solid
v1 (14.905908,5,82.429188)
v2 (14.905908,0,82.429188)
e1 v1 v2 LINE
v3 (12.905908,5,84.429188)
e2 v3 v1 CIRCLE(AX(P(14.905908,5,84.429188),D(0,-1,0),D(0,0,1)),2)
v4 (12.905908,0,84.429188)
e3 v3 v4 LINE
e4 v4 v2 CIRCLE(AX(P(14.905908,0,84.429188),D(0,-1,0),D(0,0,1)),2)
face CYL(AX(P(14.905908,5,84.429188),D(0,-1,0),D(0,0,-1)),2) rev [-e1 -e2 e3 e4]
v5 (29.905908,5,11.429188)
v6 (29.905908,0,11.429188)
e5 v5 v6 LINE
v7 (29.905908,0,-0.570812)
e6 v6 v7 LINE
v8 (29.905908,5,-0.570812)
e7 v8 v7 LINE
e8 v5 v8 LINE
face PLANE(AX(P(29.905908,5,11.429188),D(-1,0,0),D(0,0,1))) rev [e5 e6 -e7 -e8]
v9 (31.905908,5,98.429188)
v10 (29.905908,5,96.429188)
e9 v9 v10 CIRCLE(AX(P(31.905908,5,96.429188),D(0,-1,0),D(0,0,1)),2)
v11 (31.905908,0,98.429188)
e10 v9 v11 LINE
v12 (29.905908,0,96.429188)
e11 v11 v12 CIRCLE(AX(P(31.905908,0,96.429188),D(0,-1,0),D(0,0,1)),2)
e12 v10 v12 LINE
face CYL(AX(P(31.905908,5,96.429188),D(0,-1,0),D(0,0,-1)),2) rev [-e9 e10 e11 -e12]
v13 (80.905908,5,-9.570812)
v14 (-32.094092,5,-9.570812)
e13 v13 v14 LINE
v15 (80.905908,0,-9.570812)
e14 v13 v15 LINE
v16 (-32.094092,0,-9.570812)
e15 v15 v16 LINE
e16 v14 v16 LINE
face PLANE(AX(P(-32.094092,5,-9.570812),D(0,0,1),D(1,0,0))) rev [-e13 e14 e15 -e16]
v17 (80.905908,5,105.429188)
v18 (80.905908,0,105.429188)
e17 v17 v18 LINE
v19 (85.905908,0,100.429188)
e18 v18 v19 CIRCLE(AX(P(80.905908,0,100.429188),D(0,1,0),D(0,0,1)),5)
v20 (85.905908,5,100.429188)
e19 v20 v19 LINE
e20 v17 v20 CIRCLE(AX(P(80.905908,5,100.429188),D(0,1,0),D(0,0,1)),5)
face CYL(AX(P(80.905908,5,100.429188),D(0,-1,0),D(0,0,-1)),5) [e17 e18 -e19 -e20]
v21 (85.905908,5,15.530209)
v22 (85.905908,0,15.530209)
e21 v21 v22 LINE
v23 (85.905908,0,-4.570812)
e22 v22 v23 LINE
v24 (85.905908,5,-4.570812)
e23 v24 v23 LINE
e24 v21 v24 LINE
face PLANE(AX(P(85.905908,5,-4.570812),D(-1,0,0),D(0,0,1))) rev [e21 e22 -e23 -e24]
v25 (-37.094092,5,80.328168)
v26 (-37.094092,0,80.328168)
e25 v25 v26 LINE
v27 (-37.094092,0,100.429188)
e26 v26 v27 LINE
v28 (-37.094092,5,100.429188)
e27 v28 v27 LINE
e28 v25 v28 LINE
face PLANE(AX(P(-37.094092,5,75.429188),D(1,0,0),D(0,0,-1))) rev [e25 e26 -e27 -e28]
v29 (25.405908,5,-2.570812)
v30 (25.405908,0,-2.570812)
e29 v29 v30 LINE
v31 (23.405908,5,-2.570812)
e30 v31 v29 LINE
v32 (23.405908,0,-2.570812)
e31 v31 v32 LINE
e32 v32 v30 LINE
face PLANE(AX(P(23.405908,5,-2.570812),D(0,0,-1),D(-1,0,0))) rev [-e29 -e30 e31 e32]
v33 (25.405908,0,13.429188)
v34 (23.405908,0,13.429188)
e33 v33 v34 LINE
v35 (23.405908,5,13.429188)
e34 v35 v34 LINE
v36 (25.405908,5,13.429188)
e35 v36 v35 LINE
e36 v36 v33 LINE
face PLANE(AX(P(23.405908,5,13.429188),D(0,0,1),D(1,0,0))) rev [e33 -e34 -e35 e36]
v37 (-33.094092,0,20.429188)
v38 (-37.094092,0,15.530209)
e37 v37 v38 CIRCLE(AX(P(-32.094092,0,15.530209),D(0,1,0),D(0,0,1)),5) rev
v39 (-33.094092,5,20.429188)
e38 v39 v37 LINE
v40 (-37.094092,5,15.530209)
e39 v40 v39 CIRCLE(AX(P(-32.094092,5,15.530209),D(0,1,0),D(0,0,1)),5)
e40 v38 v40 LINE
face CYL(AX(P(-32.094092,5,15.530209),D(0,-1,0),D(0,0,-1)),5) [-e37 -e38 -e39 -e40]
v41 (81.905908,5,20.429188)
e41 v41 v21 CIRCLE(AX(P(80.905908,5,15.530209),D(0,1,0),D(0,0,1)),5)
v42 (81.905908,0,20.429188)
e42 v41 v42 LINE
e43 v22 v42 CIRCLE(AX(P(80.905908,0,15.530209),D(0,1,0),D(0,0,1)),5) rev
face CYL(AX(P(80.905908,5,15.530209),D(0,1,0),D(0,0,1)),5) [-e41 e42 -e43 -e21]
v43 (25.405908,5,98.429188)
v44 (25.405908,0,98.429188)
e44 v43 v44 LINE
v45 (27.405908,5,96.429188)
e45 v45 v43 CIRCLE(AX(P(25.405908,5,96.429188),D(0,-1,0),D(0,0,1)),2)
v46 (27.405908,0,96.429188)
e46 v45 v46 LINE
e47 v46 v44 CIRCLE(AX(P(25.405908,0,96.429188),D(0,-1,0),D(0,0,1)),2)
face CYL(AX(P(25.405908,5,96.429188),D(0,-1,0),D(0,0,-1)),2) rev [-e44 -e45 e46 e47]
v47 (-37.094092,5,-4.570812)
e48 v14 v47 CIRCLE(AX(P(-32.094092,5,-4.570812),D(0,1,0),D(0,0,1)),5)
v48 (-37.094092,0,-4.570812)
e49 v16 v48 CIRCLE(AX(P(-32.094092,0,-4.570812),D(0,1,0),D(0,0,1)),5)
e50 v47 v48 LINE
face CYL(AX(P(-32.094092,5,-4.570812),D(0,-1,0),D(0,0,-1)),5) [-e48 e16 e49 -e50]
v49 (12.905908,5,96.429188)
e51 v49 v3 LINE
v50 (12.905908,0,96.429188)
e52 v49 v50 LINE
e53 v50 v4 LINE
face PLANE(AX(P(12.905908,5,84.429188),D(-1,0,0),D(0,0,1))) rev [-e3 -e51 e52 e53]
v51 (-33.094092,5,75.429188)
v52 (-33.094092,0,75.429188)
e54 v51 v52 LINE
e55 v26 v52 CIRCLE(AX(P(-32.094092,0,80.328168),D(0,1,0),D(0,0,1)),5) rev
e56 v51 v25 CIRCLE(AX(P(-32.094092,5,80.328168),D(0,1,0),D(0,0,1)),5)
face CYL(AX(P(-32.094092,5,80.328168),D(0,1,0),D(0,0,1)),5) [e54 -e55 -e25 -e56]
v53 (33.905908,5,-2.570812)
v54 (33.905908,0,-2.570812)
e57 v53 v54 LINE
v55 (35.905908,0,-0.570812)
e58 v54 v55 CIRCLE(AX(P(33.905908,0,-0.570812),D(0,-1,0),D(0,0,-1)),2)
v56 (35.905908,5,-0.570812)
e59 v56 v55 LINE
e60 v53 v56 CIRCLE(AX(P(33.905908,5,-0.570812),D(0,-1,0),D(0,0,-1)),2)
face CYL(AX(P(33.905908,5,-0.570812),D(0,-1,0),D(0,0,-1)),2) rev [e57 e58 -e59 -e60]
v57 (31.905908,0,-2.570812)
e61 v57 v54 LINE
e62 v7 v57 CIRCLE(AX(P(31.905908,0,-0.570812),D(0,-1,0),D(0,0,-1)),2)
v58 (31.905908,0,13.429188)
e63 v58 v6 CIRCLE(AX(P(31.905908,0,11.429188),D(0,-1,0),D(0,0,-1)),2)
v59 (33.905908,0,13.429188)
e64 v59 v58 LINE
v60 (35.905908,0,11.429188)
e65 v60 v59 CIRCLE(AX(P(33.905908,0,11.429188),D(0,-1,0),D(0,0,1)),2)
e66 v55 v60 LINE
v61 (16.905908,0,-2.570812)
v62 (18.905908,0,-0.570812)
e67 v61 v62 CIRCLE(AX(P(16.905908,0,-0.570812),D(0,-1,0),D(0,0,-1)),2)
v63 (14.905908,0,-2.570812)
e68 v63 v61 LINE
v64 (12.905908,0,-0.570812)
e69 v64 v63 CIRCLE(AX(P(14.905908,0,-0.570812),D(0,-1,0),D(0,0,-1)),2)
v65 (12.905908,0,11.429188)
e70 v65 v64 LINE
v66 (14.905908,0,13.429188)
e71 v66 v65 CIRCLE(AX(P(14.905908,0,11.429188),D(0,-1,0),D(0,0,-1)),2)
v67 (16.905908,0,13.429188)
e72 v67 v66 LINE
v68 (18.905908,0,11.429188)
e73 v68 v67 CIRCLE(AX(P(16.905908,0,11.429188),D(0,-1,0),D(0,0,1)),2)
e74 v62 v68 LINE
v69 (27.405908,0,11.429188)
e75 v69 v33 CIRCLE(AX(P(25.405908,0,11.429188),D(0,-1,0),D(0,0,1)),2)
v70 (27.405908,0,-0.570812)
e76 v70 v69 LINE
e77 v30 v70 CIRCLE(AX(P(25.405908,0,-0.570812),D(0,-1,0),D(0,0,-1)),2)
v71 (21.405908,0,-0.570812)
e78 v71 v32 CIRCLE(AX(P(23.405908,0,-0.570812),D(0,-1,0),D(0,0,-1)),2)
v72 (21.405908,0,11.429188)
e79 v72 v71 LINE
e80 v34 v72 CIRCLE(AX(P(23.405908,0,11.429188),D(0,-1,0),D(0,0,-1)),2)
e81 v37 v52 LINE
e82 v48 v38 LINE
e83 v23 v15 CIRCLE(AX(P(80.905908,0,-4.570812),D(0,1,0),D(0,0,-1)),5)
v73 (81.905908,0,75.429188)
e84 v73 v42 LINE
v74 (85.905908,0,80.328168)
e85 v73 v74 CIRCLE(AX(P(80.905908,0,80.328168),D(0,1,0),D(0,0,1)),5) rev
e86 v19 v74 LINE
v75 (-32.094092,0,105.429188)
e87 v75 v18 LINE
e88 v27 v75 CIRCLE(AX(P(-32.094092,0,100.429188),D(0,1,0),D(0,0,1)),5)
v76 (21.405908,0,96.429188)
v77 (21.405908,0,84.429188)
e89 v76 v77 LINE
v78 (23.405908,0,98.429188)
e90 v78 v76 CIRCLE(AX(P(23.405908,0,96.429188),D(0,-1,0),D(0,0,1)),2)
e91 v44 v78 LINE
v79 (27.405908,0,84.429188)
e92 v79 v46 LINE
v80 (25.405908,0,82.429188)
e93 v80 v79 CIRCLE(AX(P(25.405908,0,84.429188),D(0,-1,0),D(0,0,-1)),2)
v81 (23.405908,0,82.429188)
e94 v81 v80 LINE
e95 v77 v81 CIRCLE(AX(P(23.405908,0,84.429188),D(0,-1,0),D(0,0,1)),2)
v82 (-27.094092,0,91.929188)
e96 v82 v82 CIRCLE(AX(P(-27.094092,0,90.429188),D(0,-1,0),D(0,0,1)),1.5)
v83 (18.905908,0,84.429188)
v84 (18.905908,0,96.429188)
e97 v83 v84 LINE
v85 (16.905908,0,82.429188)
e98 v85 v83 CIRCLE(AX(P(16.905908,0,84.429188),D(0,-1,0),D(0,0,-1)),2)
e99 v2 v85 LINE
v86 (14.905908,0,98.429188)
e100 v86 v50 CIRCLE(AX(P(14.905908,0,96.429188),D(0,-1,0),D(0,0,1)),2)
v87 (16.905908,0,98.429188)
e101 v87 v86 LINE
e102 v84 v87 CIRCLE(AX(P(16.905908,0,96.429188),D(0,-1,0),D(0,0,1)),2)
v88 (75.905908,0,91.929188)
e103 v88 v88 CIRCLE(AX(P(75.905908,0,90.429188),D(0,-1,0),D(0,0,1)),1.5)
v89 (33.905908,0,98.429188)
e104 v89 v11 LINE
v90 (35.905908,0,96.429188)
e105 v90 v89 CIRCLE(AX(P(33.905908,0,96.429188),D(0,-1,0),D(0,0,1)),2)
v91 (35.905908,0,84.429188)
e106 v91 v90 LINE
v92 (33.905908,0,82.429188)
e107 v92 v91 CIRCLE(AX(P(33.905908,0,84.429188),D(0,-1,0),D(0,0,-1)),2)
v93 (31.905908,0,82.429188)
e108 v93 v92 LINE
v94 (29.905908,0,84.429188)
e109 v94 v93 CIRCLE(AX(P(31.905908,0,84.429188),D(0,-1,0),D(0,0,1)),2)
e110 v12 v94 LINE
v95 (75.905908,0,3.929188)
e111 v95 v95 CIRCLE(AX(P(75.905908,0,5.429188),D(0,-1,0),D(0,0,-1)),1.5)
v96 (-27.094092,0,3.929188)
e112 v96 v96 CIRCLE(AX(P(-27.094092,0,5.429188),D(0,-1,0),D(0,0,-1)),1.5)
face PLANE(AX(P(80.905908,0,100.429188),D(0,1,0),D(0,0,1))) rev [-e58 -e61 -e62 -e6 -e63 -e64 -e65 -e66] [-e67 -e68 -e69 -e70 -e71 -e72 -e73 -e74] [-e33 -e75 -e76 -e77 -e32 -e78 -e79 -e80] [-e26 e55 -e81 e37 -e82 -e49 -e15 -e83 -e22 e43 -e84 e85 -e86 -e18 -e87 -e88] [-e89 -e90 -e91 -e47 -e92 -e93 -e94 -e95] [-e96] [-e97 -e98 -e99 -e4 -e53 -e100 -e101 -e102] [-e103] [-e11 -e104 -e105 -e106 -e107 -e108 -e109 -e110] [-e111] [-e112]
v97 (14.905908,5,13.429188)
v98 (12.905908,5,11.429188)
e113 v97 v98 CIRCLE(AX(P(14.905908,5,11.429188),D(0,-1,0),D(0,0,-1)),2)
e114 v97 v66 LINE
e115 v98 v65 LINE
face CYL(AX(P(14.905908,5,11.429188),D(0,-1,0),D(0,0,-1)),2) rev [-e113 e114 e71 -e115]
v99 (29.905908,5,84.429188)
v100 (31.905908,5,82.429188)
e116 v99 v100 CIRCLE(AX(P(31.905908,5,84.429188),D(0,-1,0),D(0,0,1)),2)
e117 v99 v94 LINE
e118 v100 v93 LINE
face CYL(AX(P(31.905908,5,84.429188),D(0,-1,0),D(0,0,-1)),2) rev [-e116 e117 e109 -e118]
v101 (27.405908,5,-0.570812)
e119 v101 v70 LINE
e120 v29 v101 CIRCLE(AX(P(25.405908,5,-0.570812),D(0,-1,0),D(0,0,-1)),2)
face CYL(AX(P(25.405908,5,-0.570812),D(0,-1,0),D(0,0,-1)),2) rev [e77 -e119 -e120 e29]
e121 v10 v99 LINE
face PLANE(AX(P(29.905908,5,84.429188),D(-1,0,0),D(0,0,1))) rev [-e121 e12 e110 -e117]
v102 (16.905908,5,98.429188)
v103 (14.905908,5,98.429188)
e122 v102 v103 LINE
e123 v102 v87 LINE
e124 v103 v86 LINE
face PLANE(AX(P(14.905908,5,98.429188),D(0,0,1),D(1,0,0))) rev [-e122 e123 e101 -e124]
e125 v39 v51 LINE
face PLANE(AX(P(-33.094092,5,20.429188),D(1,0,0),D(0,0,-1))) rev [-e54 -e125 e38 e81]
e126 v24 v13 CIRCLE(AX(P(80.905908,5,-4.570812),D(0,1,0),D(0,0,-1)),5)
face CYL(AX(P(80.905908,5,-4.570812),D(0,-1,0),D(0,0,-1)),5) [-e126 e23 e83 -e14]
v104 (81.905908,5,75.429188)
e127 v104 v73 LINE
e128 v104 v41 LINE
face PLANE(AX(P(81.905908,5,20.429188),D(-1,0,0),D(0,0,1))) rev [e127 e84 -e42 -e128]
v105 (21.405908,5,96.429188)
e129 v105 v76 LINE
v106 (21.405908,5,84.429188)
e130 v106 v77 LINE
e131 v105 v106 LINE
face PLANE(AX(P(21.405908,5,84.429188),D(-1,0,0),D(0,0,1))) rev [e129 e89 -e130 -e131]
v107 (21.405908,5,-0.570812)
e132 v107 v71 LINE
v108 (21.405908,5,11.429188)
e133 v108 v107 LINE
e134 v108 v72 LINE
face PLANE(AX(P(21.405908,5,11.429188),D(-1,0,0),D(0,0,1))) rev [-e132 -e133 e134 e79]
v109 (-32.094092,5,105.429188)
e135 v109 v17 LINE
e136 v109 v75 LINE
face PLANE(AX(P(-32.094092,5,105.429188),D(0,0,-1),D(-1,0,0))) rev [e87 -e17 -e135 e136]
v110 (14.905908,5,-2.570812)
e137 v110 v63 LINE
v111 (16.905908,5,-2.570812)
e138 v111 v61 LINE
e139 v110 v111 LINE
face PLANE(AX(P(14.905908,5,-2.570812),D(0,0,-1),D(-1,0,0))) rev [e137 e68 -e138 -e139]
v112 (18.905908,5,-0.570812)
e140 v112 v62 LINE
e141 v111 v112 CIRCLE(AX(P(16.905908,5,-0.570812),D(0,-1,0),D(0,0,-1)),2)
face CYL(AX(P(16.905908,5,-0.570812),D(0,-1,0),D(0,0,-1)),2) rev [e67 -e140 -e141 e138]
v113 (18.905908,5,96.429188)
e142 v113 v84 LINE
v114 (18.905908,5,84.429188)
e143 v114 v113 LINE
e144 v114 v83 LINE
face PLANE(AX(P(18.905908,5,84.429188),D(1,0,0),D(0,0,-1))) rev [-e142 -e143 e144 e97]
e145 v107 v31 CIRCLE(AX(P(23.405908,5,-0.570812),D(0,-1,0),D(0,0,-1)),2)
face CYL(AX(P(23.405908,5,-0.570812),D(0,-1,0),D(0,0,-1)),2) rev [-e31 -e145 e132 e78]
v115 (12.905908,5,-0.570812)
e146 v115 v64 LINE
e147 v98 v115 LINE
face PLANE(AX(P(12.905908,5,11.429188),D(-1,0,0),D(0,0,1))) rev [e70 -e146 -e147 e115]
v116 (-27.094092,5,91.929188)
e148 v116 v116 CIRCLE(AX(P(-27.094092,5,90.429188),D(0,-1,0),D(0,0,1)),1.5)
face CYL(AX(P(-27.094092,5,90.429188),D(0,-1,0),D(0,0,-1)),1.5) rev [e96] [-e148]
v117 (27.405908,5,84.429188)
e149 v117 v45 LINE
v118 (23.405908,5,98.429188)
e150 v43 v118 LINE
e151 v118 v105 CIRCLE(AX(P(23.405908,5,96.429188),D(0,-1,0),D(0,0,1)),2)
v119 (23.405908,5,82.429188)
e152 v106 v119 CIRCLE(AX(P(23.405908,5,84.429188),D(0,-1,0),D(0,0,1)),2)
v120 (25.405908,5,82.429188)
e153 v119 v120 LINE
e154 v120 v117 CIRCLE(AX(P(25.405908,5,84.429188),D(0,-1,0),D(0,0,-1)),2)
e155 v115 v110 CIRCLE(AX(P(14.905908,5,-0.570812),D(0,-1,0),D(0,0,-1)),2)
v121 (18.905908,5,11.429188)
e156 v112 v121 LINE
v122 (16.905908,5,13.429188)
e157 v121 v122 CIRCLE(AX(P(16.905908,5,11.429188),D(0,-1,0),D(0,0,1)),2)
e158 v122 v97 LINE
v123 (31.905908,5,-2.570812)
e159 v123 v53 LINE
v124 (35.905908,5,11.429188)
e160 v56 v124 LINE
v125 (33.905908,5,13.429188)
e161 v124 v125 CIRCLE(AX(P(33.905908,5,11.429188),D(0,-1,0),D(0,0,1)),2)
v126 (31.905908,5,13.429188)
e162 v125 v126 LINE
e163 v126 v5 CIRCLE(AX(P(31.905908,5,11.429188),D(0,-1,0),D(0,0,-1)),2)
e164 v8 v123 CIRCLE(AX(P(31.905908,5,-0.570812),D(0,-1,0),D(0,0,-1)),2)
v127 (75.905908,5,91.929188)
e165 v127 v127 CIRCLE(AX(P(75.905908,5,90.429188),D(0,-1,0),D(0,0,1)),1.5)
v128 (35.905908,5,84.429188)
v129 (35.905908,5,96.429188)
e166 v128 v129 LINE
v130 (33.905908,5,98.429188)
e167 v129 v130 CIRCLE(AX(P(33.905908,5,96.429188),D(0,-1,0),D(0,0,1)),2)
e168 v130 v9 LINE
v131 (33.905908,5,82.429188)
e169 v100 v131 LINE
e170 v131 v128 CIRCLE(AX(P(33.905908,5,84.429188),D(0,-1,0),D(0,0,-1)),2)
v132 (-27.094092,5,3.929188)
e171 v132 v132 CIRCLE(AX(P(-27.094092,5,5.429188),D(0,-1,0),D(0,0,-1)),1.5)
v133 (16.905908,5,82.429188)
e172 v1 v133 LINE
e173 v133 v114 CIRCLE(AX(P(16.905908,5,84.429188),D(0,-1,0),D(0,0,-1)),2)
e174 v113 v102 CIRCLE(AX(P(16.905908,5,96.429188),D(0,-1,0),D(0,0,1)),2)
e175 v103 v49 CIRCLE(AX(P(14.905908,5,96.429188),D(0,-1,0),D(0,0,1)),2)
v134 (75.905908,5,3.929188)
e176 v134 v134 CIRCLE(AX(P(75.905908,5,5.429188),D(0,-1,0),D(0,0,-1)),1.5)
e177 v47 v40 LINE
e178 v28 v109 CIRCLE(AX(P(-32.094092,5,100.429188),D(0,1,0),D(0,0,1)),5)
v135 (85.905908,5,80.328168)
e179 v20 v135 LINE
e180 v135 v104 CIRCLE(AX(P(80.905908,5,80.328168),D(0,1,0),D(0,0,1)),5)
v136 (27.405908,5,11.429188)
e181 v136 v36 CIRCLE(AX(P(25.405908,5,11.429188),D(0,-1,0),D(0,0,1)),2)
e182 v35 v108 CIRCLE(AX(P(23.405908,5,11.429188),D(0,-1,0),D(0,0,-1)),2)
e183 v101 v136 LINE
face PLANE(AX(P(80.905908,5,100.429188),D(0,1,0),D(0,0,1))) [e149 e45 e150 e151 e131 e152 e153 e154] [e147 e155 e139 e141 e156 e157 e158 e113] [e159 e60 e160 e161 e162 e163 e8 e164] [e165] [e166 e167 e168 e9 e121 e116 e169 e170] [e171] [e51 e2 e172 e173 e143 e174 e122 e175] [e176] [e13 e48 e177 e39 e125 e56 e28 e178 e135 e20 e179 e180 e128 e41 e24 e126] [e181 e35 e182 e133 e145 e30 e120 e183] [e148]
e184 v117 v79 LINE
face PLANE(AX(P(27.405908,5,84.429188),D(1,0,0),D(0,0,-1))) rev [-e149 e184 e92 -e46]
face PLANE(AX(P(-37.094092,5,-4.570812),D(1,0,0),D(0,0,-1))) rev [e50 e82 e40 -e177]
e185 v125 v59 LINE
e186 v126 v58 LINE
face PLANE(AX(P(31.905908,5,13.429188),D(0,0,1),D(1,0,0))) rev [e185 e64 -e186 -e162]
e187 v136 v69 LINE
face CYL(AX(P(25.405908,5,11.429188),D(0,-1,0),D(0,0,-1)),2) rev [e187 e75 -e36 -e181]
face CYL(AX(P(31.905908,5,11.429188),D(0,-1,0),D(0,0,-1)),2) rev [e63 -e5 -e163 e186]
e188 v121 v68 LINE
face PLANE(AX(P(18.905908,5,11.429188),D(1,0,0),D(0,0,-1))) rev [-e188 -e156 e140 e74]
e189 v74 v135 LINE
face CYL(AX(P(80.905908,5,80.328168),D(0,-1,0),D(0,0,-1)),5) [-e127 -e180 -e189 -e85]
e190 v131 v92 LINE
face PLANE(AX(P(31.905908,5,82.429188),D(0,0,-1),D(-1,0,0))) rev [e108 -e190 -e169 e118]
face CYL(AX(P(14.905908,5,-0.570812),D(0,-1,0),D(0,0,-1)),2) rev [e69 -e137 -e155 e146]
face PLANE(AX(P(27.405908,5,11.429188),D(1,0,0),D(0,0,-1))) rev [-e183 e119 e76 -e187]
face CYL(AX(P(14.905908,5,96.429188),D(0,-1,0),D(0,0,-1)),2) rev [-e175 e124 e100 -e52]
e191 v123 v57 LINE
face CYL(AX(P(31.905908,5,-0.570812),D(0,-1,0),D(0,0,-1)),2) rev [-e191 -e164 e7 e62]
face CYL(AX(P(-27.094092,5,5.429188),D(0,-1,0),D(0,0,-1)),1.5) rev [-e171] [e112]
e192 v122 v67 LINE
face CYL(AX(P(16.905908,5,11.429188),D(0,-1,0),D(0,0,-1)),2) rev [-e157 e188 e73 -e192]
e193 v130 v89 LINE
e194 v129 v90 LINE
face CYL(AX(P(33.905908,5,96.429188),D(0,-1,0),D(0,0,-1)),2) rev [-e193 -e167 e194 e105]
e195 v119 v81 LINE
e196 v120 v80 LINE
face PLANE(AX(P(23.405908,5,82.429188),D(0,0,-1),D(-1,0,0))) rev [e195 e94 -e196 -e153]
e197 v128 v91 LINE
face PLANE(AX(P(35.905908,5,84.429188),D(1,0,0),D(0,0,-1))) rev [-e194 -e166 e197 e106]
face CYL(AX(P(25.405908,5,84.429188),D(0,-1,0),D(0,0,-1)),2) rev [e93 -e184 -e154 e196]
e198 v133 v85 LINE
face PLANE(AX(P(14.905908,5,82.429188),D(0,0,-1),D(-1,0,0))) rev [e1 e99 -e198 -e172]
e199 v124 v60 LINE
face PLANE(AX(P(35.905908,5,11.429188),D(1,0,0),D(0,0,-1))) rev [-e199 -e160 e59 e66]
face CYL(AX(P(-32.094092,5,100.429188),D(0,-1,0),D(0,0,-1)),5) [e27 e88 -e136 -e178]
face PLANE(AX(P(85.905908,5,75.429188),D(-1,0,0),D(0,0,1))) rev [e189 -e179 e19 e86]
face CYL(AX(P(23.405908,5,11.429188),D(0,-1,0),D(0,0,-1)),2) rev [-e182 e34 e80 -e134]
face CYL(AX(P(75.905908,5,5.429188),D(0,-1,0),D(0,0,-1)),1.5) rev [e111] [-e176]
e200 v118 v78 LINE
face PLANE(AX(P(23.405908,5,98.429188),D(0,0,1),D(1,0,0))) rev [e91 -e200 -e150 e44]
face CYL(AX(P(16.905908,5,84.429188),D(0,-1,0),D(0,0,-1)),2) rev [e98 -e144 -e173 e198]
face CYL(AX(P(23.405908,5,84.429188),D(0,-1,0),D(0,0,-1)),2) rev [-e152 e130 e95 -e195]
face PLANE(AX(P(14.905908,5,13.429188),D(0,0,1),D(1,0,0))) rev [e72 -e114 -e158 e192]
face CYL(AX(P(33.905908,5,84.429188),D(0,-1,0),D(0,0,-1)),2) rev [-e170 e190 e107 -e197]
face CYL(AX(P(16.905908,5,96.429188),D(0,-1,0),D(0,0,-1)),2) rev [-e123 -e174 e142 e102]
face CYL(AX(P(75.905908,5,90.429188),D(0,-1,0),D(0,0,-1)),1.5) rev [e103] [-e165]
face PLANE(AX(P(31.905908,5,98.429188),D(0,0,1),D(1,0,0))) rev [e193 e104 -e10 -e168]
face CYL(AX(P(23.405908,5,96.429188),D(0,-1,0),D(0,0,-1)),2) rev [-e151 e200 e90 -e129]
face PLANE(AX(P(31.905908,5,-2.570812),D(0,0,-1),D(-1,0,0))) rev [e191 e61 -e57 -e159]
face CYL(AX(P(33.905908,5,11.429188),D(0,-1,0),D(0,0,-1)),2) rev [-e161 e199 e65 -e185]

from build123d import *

# Parameters (mm, degrees)
RESSALTO_EXTRUS_O1_DEPTH = 5
FILETE1_R                = 5
ESBO_O3_R                = 1.5
CORTE_EXTRUS_O1_DEPTH    = 5


with BuildPart() as part:
    # Esboço1 → Ressalto-extrusão1 (new body)
    with BuildSketch(Plane(origin=(0, 0, 0), x_dir=(1, 0, 0), z_dir=(0, 1, 0))):
        with BuildLine():
            Line((81.90590785, -20.429188404), (85.90590785, -20.429188404))
            Line((85.90590785, -20.429188404), (85.90590785, 4.570811596))
            ThreePointArc((85.90590785, 4.570811596), (84.441441756, 8.106345502), (80.90590785, 9.570811596))
            Line((80.90590785, 9.570811596), (-32.09409215, 9.570811596))
            ThreePointArc((-32.09409215, 9.570811596), (-35.629626056, 8.106345502), (-37.09409215, 4.570811596))
            Line((-37.09409215, 4.570811596), (-37.09409215, -20.429188404))
            Line((-37.09409215, -20.429188404), (-33.09409215, -20.429188404))
            Line((-33.09409215, -20.429188404), (-33.09409215, -75.429188404))
            Line((-33.09409215, -75.429188404), (-37.09409215, -75.429188404))
            Line((-37.09409215, -75.429188404), (-37.09409215, -100.429188404))
            ThreePointArc((-37.09409215, -100.429188404), (-35.629626056, -103.96472231), (-32.09409215, -105.429188404))
            Line((-32.09409215, -105.429188404), (80.90590785, -105.429188404))
            ThreePointArc((80.90590785, -105.429188404), (84.441441756, -103.96472231), (85.90590785, -100.429188404))
            Line((85.90590785, -100.429188404), (85.90590785, -75.429188404))
            Line((85.90590785, -75.429188404), (81.90590785, -75.429188404))
            Line((81.90590785, -75.429188404), (81.90590785, -20.429188404))
        make_face()
    extrude(amount=RESSALTO_EXTRUS_O1_DEPTH)

    # Filete1
    # the kernel refuses this fillet: 5 mm, written as the material it takes off along each edge
    with BuildSketch(Plane(origin=(-37.09409215, -12.247448714, 75.429188404), x_dir=(1.0, 0, 1.5738521597081158e-12), z_dir=(0, 1, 0)), Plane(origin=(85.90590785, -12.247448714, 20.429188404), x_dir=(-1.0, 0, -1.5685230891899197e-12), z_dir=(0, 1, 0))) as filete1_piece_1:
        with BuildLine():
            CenterArc((5, -4.898979486), FILETE1_R, 101.536959033, 78.463040967)
            Line((0, -4.898979486), (-0.1, -4.898979486))
            Line((-0.1, -4.898979486), (-0.1, 0))
            Line((-0.1, 0), (0, 0.1))
            ThreePointArc((0, 0.1), (2, 0.1), (3.98, 0.09797959))
            Line((3.98, 0.09797959), (4, 0))
        make_face()
    extrude(amount=29.494897428, mode=Mode.SUBTRACT)
    with BuildSketch(Plane(origin=(-37.09409215, -12.247448714, 20.429188404), x_dir=(0, 0, -1), z_dir=(0, 1, 0)), Plane(origin=(85.90590785, -12.247448714, 75.429188404), x_dir=(0, 0, 1), z_dir=(0, 1, 0))) as filete1_piece_2:
        with BuildLine():
            CenterArc((4.898979486, -5), FILETE1_R, 90, 78.463040967)
            Line((0, -4), (-0.09797959, -3.98))
            ThreePointArc((-0.09797959, -3.98), (-0.1, -2), (-0.1, 0))
            Line((-0.1, 0), (0, 0.1))
            Line((0, 0.1), (4.898979486, 0.1))
            Line((4.898979486, 0.1), (4.898979486, 0))
        make_face()
    extrude(amount=29.494897428, mode=Mode.SUBTRACT)

    # Esboço3 → Corte-extrusão1 (cut)
    with BuildSketch(Plane.XZ):
        with Locations(Location((-27.09409215, 5.429188404, 0), (0, 0, 270))):
            Circle(ESBO_O3_R)
        with Locations(Location((75.90590785, 5.429188404, 0), (0, 0, 270))):
            Circle(ESBO_O3_R)
        with Locations(Location((75.90590785, 90.429188404, 0), (0, 0, 90))):
            Circle(ESBO_O3_R)
        with Locations(Location((-27.09409215, 90.429188404, 0), (0, 0, 90))):
            Circle(ESBO_O3_R)
        with BuildLine():
            Line((35.90590785, 84.429188404), (35.90590785, 96.429188404))
            ThreePointArc((35.90590785, 96.429188404), (35.320121412, 97.843401966), (33.90590785, 98.429188404))
            Line((33.90590785, 98.429188404), (31.90590785, 98.429188404))
            ThreePointArc((31.90590785, 98.429188404), (30.491694287, 97.843401966), (29.90590785, 96.429188404))
            Line((29.90590785, 96.429188404), (29.90590785, 84.429188404))
            ThreePointArc((29.90590785, 84.429188404), (30.491694287, 83.014974841), (31.90590785, 82.429188404))
            Line((31.90590785, 82.429188404), (33.90590785, 82.429188404))
            ThreePointArc((33.90590785, 82.429188404), (35.320121412, 83.014974841), (35.90590785, 84.429188404))
        make_face()
        with BuildLine():
            Line((14.90590785, 13.429188404), (16.90590785, 13.429188404))
            ThreePointArc((16.90590785, 13.429188404), (18.320121412, 12.843401966), (18.90590785, 11.429188404))
            Line((18.90590785, 11.429188404), (18.90590785, -0.570811596))
            ThreePointArc((18.90590785, -0.570811596), (18.320121412, -1.985025159), (16.90590785, -2.570811596))
            Line((16.90590785, -2.570811596), (14.90590785, -2.570811596))
            ThreePointArc((14.90590785, -2.570811596), (13.491694287, -1.985025159), (12.90590785, -0.570811596))
            Line((12.90590785, -0.570811596), (12.90590785, 11.429188404))
            ThreePointArc((12.90590785, 11.429188404), (13.491694287, 12.843401966), (14.90590785, 13.429188404))
        make_face()
        with BuildLine():
            Line((23.40590785, 13.429188404), (25.40590785, 13.429188404))
            ThreePointArc((25.40590785, 13.429188404), (26.820121412, 12.843401966), (27.40590785, 11.429188404))
            Line((27.40590785, 11.429188404), (27.40590785, -0.570811596))
            ThreePointArc((27.40590785, -0.570811596), (26.820121412, -1.985025159), (25.40590785, -2.570811596))
            Line((25.40590785, -2.570811596), (23.40590785, -2.570811596))
            ThreePointArc((23.40590785, -2.570811596), (21.991694287, -1.985025159), (21.40590785, -0.570811596))
            Line((21.40590785, -0.570811596), (21.40590785, 11.429188404))
            ThreePointArc((21.40590785, 11.429188404), (21.991694287, 12.843401966), (23.40590785, 13.429188404))
        make_face()
        with BuildLine():
            Line((31.90590785, 13.429188404), (33.90590785, 13.429188404))
            ThreePointArc((33.90590785, 13.429188404), (35.320121412, 12.843401966), (35.90590785, 11.429188404))
            Line((35.90590785, 11.429188404), (35.90590785, -0.570811596))
            ThreePointArc((35.90590785, -0.570811596), (35.320121412, -1.985025159), (33.90590785, -2.570811596))
            Line((33.90590785, -2.570811596), (31.90590785, -2.570811596))
            ThreePointArc((31.90590785, -2.570811596), (30.491694287, -1.985025159), (29.90590785, -0.570811596))
            Line((29.90590785, -0.570811596), (29.90590785, 11.429188404))
            ThreePointArc((29.90590785, 11.429188404), (30.491694287, 12.843401966), (31.90590785, 13.429188404))
        make_face()
        with BuildLine():
            Line((27.40590785, 84.429188404), (27.40590785, 96.429188404))
            ThreePointArc((27.40590785, 96.429188404), (26.820121412, 97.843401966), (25.40590785, 98.429188404))
            Line((25.40590785, 98.429188404), (23.40590785, 98.429188404))
            ThreePointArc((23.40590785, 98.429188404), (21.991694287, 97.843401966), (21.40590785, 96.429188404))
            Line((21.40590785, 96.429188404), (21.40590785, 84.429188404))
            ThreePointArc((21.40590785, 84.429188404), (21.991694287, 83.014974841), (23.40590785, 82.429188404))
            Line((23.40590785, 82.429188404), (25.40590785, 82.429188404))
            ThreePointArc((25.40590785, 82.429188404), (26.820121412, 83.014974841), (27.40590785, 84.429188404))
        make_face()
        with BuildLine():
            Line((18.90590785, 84.429188404), (18.90590785, 96.429188404))
            ThreePointArc((18.90590785, 96.429188404), (18.320121412, 97.843401966), (16.90590785, 98.429188404))
            Line((16.90590785, 98.429188404), (14.90590785, 98.429188404))
            ThreePointArc((14.90590785, 98.429188404), (13.491694287, 97.843401966), (12.90590785, 96.429188404))
            Line((12.90590785, 96.429188404), (12.90590785, 84.429188404))
            ThreePointArc((12.90590785, 84.429188404), (13.491694287, 83.014974841), (14.90590785, 82.429188404))
            Line((14.90590785, 82.429188404), (16.90590785, 82.429188404))
            ThreePointArc((16.90590785, 82.429188404), (18.320121412, 83.014974841), (18.90590785, 84.429188404))
        make_face()
    extrude(amount=-CORTE_EXTRUS_O1_DEPTH, mode=Mode.SUBTRACT)


solid = part.part
